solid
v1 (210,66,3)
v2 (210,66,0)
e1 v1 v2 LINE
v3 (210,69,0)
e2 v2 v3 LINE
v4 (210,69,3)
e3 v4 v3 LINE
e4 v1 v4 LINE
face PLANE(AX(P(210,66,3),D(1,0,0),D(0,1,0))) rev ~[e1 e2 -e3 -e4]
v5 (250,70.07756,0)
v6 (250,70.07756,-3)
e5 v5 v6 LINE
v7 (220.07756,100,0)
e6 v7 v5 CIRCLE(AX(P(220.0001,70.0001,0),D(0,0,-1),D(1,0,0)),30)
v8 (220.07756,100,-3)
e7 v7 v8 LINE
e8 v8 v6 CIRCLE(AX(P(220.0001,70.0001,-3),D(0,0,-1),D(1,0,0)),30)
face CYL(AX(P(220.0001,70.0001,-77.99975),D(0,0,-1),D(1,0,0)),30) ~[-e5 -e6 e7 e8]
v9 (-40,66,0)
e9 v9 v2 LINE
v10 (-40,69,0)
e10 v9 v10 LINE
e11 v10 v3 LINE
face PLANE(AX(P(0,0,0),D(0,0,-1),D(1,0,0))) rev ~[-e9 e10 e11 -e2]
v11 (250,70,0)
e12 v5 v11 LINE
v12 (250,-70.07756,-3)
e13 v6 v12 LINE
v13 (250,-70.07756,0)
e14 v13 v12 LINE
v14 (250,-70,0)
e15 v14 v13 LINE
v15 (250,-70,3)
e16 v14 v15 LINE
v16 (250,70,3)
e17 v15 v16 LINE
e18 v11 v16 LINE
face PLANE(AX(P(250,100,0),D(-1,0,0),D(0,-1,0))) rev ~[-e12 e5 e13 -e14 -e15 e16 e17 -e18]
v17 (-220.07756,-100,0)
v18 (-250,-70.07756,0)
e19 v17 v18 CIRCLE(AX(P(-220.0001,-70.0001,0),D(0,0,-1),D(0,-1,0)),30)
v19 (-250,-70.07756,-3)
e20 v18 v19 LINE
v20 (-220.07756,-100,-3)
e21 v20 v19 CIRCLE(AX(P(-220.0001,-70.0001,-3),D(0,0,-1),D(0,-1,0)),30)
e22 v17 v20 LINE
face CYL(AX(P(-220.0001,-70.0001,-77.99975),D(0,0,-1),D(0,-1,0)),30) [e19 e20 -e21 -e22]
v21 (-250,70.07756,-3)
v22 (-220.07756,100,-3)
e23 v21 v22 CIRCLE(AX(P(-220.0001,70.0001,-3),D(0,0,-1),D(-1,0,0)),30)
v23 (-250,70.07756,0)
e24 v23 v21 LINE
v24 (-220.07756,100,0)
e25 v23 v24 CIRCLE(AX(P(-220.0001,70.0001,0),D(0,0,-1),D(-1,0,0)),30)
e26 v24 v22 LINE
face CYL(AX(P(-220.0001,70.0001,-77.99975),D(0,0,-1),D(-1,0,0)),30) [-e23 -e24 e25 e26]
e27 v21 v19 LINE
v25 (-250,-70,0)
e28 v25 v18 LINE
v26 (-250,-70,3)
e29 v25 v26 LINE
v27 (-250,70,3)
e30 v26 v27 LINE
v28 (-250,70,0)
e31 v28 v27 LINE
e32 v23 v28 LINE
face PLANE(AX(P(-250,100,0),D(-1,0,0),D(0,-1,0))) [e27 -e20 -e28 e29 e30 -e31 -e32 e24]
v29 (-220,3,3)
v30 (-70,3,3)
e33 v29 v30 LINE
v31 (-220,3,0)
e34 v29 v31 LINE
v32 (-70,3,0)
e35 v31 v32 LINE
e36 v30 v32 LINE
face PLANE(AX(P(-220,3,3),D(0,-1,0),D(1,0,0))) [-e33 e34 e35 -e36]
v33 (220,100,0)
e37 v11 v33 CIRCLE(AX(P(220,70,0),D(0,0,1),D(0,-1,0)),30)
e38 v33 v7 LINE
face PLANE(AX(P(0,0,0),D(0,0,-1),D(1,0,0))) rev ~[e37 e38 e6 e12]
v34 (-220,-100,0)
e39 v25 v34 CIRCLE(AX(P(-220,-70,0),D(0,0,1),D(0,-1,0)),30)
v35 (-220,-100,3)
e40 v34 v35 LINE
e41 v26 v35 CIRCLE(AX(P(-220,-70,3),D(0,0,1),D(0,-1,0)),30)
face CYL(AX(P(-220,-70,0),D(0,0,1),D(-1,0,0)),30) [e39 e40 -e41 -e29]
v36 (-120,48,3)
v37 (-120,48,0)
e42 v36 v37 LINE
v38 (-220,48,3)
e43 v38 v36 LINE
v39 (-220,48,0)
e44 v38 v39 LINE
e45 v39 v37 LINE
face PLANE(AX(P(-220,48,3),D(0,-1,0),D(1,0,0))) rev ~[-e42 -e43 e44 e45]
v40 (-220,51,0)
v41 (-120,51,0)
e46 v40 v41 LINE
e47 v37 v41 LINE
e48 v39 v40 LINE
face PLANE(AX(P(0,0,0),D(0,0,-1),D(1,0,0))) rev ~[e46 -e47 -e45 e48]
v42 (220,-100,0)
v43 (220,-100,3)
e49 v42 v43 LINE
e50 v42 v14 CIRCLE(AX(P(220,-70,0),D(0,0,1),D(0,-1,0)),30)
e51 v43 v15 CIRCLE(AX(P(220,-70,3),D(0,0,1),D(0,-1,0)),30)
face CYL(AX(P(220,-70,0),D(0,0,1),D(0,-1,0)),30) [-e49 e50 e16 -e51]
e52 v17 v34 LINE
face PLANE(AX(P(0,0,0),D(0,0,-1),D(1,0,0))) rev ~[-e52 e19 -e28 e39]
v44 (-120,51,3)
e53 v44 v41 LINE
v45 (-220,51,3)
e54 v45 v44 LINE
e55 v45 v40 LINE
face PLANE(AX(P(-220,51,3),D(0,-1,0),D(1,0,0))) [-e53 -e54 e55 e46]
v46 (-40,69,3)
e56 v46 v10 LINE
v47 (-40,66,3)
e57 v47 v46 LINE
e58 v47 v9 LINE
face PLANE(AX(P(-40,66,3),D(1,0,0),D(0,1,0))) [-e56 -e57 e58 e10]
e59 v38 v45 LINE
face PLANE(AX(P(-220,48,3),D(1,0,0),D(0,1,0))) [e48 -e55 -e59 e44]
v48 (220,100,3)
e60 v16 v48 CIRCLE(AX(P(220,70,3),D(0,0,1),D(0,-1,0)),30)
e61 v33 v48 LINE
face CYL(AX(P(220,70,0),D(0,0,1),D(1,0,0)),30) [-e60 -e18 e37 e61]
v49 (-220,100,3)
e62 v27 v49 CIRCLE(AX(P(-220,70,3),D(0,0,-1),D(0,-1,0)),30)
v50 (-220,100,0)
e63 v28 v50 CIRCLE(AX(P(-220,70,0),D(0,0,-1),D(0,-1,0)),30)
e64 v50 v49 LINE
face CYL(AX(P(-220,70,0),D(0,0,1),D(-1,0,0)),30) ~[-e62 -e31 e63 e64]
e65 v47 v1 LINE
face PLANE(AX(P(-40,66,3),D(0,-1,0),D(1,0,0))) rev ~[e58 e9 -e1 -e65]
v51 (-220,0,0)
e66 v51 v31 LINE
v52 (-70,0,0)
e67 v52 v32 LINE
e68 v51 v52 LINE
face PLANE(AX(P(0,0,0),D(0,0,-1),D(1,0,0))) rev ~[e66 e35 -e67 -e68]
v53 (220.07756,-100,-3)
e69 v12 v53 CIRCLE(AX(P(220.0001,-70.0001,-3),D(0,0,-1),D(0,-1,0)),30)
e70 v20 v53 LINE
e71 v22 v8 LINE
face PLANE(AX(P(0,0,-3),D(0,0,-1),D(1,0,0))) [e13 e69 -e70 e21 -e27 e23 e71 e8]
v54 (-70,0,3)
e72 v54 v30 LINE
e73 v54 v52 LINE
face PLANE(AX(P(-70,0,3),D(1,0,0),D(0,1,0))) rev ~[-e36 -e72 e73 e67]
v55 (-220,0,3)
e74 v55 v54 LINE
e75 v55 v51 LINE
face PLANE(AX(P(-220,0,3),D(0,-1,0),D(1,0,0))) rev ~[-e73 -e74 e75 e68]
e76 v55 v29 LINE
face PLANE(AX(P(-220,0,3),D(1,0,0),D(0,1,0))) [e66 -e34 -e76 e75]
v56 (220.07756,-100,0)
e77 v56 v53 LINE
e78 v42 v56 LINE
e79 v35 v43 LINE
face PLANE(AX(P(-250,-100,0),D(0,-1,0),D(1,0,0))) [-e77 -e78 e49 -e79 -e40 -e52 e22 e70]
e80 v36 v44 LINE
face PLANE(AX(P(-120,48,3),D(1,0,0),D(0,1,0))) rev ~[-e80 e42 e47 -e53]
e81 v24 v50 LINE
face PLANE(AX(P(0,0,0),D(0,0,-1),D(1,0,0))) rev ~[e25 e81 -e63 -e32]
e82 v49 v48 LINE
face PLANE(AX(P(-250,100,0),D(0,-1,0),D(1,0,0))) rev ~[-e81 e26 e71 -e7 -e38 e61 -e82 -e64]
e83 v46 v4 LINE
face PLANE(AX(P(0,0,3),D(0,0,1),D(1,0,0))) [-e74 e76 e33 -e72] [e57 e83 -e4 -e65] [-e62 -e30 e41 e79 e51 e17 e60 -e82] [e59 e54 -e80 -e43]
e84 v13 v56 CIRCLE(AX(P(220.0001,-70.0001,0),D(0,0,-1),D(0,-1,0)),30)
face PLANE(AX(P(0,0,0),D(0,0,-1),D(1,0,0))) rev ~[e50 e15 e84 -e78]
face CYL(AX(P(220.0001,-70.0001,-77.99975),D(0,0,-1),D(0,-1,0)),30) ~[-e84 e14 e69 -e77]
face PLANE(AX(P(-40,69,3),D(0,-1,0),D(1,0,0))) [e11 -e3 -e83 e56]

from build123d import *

# Parameters (mm, degrees)
F0_W        = 500
F0_H        = 200
F1_DEPTH    = 3
F2_R        = 30
F3_W        = 100
F3_H        = 3
F3_W_2      = 150
F3_W_3      = 250
F4_DEPTH    = 3
F5_W        = 500
F5_H        = 200
F6_DEPTH    = 3
F7_T1_DEPTH = 152.9995000008


# Not quite as in the source:
# - a fillet or chamfer that OpenCascade refuses, or shapes differently, is made with other operations: its cross-section is extruded or revolved along the edge and cut away or added


with BuildPart() as f1:
    # F0 (on Top) → F1 (new body)
    with BuildSketch(Plane.XY):
        Rectangle(F0_W, F0_H)
    extrude(amount=F1_DEPTH)

    # F2
    f2_edges = [f1.edges().sort_by_distance(p)[0] for p in [
        (-250, -100, 1.5),
        (250, 100, 1.5),
        (-250, 100, 1.5),
        (250, -100, 1.5),
    ]]
    fillet(f2_edges, radius=F2_R)

    # F3 (on face) → F4 (cut)
    with BuildSketch(Plane.XY.offset(3)):
        with Locations((-170, 49.5)):
            Rectangle(F3_W, F3_H)
        with Locations((-145, 1.5)):
            Rectangle(F3_W_2, F3_H)
        with Locations((85, 67.5)):
            Rectangle(F3_W_3, F3_H)
    extrude(amount=-F4_DEPTH, mode=Mode.SUBTRACT)

    # F5 (on face) → F6 (join)
    with BuildSketch(Plane(origin=(0, 0, 0), x_dir=(1, 0, 0), z_dir=(0, 0, -1))):
        Rectangle(F5_W, F5_H)
    extrude(amount=F6_DEPTH)

    # F7: fillet of radius 30 on 4 edges, made by hand

    # F7_s2 → F7_t1 (cut)
    with BuildSketch(Plane.XY.offset(-77.9997500004)):
        with BuildLine():
            ThreePointArc((-220.0001, -100.0001), (-241.2133034356, -91.2133034356), (-250.0001, -70.0001))
            Line((-250.0001, -70.0001), (-250.6001, -70.0001))
            ThreePointArc((-250.6001, -70.0001), (-250.6, -85.00005), (-250.6, -100))
            Line((-250.6, -100), (-250, -100.6))
            ThreePointArc((-250, -100.6), (-235.00005, -100.6), (-220.0001, -100.6001))
            Line((-220.0001, -100.6001), (-220.0001, -100.0001))
        make_face()
        with BuildLine():
            ThreePointArc((-250.0001, 70.0001), (-241.2133034356, 91.2133034356), (-220.0001, 100.0001))
            Line((-220.0001, 100.0001), (-220.0001, 100.6001))
            ThreePointArc((-220.0001, 100.6001), (-235.00005, 100.6), (-250, 100.6))
            Line((-250, 100.6), (-250.6, 100))
            ThreePointArc((-250.6, 100), (-250.6, 85.00005), (-250.6001, 70.0001))
            Line((-250.6001, 70.0001), (-250.0001, 70.0001))
        make_face()
        with BuildLine():
            ThreePointArc((250.0001, 70.0001), (241.2133034356, 91.2133034356), (220.0001, 100.0001))
            Line((220.0001, 100.0001), (220.0001, 100.6001))
            ThreePointArc((220.0001, 100.6001), (235.00005, 100.6), (250, 100.6))
            Line((250, 100.6), (250.6, 100))
            ThreePointArc((250.6, 100), (250.6, 85.00005), (250.6001, 70.0001))
            Line((250.6001, 70.0001), (250.0001, 70.0001))
        make_face()
        with BuildLine():
            ThreePointArc((220.0001, -100.0001), (241.2133034356, -91.2133034356), (250.0001, -70.0001))
            Line((250.0001, -70.0001), (250.6001, -70.0001))
            ThreePointArc((250.6001, -70.0001), (250.6, -85.00005), (250.6, -100))
            Line((250.6, -100), (250, -100.6))
            ThreePointArc((250, -100.6), (235.00005, -100.6), (220.0001, -100.6001))
            Line((220.0001, -100.6001), (220.0001, -100.0001))
        make_face()
    extrude(amount=F7_T1_DEPTH, mode=Mode.SUBTRACT)


solid = f1.part
